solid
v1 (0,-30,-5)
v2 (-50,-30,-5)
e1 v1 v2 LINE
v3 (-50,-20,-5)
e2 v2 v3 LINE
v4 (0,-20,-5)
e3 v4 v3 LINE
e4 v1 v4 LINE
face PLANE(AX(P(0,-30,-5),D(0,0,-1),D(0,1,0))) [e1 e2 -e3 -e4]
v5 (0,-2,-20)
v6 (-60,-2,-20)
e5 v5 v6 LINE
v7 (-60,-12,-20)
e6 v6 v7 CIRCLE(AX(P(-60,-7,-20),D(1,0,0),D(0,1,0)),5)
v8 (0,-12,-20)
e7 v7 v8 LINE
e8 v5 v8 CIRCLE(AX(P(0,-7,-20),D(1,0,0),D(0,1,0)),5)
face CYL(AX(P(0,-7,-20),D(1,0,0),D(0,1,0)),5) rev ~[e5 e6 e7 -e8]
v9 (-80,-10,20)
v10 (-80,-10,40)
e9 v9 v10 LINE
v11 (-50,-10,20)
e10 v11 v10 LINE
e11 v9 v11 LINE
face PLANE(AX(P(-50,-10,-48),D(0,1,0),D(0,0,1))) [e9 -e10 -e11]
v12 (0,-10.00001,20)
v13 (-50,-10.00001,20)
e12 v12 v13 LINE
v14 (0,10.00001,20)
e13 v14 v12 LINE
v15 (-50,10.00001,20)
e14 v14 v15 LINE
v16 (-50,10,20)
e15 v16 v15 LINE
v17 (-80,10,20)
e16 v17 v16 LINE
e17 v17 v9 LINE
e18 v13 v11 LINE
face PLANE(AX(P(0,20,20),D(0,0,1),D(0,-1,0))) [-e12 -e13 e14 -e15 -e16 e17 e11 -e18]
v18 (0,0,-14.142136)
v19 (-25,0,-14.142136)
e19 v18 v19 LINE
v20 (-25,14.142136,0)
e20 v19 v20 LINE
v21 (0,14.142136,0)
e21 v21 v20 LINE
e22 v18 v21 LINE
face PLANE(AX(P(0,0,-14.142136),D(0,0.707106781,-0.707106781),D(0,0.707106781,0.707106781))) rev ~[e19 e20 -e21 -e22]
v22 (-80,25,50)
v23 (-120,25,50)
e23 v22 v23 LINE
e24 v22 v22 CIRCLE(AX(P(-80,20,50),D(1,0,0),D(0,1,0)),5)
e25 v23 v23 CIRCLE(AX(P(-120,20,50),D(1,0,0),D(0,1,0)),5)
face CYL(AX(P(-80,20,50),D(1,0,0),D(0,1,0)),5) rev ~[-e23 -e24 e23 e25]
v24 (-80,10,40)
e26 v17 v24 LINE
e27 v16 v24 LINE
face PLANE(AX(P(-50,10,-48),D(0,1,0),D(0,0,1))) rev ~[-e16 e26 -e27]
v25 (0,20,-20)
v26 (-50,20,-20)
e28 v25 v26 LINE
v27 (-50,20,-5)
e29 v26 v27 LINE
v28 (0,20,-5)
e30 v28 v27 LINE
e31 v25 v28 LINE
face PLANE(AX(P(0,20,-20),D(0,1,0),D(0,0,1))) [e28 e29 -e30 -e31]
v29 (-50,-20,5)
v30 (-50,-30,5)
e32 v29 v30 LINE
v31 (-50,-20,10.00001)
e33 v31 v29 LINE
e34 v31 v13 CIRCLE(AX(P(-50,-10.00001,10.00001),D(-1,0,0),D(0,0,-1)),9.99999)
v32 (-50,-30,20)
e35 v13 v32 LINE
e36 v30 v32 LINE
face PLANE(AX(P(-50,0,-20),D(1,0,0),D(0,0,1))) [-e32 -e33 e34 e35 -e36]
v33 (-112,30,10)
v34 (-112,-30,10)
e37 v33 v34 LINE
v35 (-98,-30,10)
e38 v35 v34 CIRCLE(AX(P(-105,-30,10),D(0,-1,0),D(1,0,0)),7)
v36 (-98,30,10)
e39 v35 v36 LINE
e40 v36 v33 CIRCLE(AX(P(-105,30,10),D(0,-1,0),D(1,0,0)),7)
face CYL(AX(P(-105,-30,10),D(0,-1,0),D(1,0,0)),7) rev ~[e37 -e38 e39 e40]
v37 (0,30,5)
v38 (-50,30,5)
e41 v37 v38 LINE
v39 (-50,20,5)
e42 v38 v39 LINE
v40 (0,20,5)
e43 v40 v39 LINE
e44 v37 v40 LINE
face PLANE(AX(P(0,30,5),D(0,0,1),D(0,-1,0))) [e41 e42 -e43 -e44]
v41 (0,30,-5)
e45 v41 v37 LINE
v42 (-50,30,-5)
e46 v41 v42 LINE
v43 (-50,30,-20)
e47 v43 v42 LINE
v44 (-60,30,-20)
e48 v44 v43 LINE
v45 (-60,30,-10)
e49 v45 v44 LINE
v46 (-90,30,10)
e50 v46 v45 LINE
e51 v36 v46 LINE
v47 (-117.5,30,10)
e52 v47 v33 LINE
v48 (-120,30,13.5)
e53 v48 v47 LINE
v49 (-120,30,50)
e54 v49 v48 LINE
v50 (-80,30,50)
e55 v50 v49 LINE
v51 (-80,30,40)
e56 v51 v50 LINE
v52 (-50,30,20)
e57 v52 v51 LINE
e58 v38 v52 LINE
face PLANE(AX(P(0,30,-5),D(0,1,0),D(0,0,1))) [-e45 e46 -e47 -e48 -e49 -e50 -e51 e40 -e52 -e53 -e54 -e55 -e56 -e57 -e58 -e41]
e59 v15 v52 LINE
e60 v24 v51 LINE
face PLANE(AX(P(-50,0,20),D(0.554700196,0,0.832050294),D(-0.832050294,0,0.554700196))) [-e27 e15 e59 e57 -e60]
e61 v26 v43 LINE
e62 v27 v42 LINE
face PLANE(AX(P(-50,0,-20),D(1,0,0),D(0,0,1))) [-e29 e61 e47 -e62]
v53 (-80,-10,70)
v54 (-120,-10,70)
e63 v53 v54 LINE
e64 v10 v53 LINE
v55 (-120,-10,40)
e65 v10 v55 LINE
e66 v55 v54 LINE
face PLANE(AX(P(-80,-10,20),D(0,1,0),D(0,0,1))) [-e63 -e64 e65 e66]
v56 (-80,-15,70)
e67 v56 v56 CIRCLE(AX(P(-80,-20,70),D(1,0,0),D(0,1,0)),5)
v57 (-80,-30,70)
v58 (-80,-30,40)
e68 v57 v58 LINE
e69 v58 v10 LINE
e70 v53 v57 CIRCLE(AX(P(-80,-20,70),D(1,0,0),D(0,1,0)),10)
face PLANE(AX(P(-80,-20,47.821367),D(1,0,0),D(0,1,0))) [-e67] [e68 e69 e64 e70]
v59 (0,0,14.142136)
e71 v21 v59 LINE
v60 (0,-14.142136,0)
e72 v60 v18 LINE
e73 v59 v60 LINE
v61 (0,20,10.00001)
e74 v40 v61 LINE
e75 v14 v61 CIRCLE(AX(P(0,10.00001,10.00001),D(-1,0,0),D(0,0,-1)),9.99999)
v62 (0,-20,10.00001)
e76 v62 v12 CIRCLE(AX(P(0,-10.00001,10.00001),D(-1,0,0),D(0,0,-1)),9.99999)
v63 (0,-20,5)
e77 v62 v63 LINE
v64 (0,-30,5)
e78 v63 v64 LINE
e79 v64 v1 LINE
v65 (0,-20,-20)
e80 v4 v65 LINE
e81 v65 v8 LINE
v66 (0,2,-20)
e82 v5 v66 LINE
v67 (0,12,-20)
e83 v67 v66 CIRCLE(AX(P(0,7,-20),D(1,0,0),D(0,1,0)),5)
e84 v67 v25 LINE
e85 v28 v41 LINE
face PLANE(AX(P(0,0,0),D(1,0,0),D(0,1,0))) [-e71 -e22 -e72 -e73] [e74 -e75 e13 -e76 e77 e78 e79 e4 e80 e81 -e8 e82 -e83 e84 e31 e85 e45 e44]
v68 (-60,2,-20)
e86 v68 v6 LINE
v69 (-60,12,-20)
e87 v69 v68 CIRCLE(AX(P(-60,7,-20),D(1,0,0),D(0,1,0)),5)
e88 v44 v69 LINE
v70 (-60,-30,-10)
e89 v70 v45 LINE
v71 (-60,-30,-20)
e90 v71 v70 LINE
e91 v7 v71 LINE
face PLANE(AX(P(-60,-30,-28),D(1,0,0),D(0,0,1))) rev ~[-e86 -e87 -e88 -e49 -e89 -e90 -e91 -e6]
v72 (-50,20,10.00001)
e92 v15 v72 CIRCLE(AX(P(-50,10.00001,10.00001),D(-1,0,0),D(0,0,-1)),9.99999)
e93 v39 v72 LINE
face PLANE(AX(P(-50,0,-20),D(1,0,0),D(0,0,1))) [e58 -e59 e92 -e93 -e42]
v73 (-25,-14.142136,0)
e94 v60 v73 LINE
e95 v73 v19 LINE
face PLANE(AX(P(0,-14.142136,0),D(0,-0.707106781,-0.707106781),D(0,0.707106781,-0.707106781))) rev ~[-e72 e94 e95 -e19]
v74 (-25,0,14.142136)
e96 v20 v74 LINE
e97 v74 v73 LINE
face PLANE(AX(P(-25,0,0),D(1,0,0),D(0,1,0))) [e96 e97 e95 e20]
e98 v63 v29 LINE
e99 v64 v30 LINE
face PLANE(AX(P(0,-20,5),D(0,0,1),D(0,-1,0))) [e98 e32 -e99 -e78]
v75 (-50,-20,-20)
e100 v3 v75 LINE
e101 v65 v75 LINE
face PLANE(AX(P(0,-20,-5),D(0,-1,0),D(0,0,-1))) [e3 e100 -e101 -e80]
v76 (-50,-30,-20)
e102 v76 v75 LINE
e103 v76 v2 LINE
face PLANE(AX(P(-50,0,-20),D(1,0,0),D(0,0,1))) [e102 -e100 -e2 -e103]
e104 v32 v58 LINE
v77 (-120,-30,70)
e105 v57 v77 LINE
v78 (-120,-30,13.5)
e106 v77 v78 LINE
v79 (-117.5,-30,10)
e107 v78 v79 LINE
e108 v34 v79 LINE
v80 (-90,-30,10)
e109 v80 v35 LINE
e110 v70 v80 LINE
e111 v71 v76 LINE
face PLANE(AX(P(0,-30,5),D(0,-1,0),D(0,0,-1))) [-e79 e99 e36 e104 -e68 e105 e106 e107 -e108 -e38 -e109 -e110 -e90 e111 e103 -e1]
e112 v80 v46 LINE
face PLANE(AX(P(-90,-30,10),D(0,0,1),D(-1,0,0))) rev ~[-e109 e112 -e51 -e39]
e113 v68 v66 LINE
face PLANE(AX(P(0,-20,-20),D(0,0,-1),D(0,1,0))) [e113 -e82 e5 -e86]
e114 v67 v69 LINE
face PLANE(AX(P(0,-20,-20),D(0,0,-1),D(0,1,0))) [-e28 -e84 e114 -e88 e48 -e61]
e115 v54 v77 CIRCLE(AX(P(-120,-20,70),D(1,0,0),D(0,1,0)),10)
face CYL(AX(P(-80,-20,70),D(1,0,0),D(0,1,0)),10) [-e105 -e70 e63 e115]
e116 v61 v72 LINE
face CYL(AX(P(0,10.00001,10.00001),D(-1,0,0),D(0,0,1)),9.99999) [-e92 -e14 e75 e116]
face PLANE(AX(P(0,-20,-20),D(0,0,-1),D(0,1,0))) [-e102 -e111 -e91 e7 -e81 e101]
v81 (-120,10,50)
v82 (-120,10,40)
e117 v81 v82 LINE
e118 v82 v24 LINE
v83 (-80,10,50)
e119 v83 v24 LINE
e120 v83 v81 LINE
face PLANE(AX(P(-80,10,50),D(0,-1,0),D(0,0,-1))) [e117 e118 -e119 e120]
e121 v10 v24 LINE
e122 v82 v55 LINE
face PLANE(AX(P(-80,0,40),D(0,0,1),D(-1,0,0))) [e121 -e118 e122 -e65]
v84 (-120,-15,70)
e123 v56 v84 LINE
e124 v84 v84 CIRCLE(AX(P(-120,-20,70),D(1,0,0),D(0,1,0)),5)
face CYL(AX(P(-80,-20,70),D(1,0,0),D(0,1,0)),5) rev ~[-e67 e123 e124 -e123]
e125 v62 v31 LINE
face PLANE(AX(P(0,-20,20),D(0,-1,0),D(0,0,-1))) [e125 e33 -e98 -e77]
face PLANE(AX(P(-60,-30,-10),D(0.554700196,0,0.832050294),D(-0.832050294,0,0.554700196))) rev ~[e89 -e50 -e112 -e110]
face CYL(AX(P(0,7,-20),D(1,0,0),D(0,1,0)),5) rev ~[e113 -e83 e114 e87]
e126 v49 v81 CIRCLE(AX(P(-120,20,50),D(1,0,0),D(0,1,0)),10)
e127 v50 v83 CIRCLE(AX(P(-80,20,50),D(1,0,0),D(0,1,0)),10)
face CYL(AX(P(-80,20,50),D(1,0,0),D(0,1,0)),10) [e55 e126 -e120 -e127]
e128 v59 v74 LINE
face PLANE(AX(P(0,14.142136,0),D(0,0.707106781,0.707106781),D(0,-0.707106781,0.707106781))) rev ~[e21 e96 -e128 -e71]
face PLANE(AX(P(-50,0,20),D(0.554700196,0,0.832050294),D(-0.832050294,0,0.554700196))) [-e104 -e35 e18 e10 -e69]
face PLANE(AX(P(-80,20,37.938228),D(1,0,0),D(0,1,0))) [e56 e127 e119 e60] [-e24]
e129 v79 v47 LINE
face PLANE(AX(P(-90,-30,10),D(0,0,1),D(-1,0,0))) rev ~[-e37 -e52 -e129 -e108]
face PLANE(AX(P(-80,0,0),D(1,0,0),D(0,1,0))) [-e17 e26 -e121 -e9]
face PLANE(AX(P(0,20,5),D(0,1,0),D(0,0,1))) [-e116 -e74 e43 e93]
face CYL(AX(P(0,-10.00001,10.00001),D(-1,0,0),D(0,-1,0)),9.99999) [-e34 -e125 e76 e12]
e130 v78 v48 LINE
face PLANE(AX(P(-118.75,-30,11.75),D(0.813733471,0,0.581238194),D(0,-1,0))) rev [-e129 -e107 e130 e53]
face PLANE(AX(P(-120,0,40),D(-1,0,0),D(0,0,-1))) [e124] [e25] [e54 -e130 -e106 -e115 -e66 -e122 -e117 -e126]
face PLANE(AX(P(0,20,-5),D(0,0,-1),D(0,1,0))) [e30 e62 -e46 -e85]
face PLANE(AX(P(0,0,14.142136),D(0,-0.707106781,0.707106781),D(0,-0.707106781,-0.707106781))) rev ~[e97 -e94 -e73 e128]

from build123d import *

# Parameters (mm, degrees)
F1_DEPTH      = 30
F1_DEPTH_BACK = 30
F3_W          = 20
F3_H          = 96
F4_DEPTH      = 30
F6_DEPTH      = 40
F8_DEPTH      = 90
F9_DEPTH      = 60.001
F11_DEPTH     = 25
F12_R         = 9.99999
F13_R         = 5
F14_DEPTH     = 120.001
F15_R         = 5
F16_DEPTH     = 40.001
F17_SIZE2     = 2.5
F17_SIZE      = 3.5
F18_R         = 7
F19_DEPTH     = 60.001


# Not quite as in the source:
# - a fillet or chamfer is up to 0.001 mm smaller than in the source, because OpenCascade refuses the exact size


with BuildPart() as f1:
    # F0 (on Front) → F1 (new body, two sides)
    with BuildSketch(Plane.XZ) as f1_sk:
        Polygon((-80, 40), (-120, 40), (-120, -20), (-50, -20), (-50, 20), align=None)
    extrude(amount=F1_DEPTH)
    extrude(f1_sk.sketch, amount=-F1_DEPTH_BACK)

    # F3 (on face) → F4 (cut)
    with BuildSketch(Plane.YZ.offset(-50)):
        Rectangle(F3_W, F3_H)
    extrude(amount=-F4_DEPTH, mode=Mode.SUBTRACT)

    # F5 (on face) → F6 (join)
    with BuildSketch(Plane.YZ.offset(-80)):
        with BuildLine():
            Line((-30, 20), (-10, 20))
            Line((-10, 20), (-10, 70))
            ThreePointArc((-10, 70), (-20, 80), (-30, 70))
            Line((-30, 70), (-30, 20))
        make_face()
        with BuildLine():
            Line((10, 50), (10, 20))
            Line((10, 20), (30, 20))
            Line((30, 20), (30, 50))
            ThreePointArc((30, 50), (20, 60), (10, 50))
        make_face()
    extrude(amount=-F6_DEPTH)

    # F7 (on Right) → F8 (join)
    with BuildSketch(Plane.YZ):
        Polygon((-20, 5), (-30, 5), (-30, -5), (-20, -5), (-20, -20), (20, -20), (20, -5), (30, -5), (30, 5), (20, 5), (20, 20), (-20, 20), align=None)
    extrude(amount=-F8_DEPTH)

    # F2 (on face) → F9 (cut, through all)
    with BuildSketch(Plane.XZ.offset(30)):
        Polygon((-90, 10), (-128, 10), (-128, -28), (-60, -28), (-60, -10), align=None)
    extrude(amount=-F9_DEPTH, mode=Mode.SUBTRACT)

    # F10 (on face) → F11 (cut)
    with BuildSketch(Plane.YZ):
        Polygon((0, 14.1421356237), (-14.1421356237, 0), (0, -14.1421356237), (14.1421356237, 0), align=None)
    extrude(amount=-F11_DEPTH, mode=Mode.SUBTRACT)

    # F12 (radius 10 in the source; OpenCascade refuses exactly that, so slightly less here)
    f12_edges = [f1.edges().sort_by_distance(p)[0] for p in [
        (-25, 20, 20),
        (-25, -20, 20),
    ]]
    fillet(f12_edges, radius=F12_R)

    # F13 (on face) → F14 (cut, through all)
    with BuildSketch(Plane.YZ):
        with Locations((-7, -20)):
            Circle(F13_R)
        with Locations((7, -20)):
            Circle(F13_R)
    extrude(amount=-F14_DEPTH, mode=Mode.SUBTRACT)

    # F15 (on face) → F16 (cut, through all)
    with BuildSketch(Plane.YZ.offset(-80)):
        with Locations((-20, 70)):
            Circle(F15_R)
        with Locations((20, 50)):
            Circle(F15_R)
    extrude(amount=-F16_DEPTH, mode=Mode.SUBTRACT)

    # F17
    f17_edges = [f1.edges().sort_by_distance(p)[0] for p in [
        (-120, 0, 10),
    ]]
    chamfer(f17_edges, length=F17_SIZE, length2=F17_SIZE2)

    # F18 (on face) → F19 (cut, through all)
    with BuildSketch(Plane.XZ.offset(30)):
        with Locations((-105, 10)):
            Circle(F18_R)
    extrude(amount=-F19_DEPTH, mode=Mode.SUBTRACT)


solid = f1.part
